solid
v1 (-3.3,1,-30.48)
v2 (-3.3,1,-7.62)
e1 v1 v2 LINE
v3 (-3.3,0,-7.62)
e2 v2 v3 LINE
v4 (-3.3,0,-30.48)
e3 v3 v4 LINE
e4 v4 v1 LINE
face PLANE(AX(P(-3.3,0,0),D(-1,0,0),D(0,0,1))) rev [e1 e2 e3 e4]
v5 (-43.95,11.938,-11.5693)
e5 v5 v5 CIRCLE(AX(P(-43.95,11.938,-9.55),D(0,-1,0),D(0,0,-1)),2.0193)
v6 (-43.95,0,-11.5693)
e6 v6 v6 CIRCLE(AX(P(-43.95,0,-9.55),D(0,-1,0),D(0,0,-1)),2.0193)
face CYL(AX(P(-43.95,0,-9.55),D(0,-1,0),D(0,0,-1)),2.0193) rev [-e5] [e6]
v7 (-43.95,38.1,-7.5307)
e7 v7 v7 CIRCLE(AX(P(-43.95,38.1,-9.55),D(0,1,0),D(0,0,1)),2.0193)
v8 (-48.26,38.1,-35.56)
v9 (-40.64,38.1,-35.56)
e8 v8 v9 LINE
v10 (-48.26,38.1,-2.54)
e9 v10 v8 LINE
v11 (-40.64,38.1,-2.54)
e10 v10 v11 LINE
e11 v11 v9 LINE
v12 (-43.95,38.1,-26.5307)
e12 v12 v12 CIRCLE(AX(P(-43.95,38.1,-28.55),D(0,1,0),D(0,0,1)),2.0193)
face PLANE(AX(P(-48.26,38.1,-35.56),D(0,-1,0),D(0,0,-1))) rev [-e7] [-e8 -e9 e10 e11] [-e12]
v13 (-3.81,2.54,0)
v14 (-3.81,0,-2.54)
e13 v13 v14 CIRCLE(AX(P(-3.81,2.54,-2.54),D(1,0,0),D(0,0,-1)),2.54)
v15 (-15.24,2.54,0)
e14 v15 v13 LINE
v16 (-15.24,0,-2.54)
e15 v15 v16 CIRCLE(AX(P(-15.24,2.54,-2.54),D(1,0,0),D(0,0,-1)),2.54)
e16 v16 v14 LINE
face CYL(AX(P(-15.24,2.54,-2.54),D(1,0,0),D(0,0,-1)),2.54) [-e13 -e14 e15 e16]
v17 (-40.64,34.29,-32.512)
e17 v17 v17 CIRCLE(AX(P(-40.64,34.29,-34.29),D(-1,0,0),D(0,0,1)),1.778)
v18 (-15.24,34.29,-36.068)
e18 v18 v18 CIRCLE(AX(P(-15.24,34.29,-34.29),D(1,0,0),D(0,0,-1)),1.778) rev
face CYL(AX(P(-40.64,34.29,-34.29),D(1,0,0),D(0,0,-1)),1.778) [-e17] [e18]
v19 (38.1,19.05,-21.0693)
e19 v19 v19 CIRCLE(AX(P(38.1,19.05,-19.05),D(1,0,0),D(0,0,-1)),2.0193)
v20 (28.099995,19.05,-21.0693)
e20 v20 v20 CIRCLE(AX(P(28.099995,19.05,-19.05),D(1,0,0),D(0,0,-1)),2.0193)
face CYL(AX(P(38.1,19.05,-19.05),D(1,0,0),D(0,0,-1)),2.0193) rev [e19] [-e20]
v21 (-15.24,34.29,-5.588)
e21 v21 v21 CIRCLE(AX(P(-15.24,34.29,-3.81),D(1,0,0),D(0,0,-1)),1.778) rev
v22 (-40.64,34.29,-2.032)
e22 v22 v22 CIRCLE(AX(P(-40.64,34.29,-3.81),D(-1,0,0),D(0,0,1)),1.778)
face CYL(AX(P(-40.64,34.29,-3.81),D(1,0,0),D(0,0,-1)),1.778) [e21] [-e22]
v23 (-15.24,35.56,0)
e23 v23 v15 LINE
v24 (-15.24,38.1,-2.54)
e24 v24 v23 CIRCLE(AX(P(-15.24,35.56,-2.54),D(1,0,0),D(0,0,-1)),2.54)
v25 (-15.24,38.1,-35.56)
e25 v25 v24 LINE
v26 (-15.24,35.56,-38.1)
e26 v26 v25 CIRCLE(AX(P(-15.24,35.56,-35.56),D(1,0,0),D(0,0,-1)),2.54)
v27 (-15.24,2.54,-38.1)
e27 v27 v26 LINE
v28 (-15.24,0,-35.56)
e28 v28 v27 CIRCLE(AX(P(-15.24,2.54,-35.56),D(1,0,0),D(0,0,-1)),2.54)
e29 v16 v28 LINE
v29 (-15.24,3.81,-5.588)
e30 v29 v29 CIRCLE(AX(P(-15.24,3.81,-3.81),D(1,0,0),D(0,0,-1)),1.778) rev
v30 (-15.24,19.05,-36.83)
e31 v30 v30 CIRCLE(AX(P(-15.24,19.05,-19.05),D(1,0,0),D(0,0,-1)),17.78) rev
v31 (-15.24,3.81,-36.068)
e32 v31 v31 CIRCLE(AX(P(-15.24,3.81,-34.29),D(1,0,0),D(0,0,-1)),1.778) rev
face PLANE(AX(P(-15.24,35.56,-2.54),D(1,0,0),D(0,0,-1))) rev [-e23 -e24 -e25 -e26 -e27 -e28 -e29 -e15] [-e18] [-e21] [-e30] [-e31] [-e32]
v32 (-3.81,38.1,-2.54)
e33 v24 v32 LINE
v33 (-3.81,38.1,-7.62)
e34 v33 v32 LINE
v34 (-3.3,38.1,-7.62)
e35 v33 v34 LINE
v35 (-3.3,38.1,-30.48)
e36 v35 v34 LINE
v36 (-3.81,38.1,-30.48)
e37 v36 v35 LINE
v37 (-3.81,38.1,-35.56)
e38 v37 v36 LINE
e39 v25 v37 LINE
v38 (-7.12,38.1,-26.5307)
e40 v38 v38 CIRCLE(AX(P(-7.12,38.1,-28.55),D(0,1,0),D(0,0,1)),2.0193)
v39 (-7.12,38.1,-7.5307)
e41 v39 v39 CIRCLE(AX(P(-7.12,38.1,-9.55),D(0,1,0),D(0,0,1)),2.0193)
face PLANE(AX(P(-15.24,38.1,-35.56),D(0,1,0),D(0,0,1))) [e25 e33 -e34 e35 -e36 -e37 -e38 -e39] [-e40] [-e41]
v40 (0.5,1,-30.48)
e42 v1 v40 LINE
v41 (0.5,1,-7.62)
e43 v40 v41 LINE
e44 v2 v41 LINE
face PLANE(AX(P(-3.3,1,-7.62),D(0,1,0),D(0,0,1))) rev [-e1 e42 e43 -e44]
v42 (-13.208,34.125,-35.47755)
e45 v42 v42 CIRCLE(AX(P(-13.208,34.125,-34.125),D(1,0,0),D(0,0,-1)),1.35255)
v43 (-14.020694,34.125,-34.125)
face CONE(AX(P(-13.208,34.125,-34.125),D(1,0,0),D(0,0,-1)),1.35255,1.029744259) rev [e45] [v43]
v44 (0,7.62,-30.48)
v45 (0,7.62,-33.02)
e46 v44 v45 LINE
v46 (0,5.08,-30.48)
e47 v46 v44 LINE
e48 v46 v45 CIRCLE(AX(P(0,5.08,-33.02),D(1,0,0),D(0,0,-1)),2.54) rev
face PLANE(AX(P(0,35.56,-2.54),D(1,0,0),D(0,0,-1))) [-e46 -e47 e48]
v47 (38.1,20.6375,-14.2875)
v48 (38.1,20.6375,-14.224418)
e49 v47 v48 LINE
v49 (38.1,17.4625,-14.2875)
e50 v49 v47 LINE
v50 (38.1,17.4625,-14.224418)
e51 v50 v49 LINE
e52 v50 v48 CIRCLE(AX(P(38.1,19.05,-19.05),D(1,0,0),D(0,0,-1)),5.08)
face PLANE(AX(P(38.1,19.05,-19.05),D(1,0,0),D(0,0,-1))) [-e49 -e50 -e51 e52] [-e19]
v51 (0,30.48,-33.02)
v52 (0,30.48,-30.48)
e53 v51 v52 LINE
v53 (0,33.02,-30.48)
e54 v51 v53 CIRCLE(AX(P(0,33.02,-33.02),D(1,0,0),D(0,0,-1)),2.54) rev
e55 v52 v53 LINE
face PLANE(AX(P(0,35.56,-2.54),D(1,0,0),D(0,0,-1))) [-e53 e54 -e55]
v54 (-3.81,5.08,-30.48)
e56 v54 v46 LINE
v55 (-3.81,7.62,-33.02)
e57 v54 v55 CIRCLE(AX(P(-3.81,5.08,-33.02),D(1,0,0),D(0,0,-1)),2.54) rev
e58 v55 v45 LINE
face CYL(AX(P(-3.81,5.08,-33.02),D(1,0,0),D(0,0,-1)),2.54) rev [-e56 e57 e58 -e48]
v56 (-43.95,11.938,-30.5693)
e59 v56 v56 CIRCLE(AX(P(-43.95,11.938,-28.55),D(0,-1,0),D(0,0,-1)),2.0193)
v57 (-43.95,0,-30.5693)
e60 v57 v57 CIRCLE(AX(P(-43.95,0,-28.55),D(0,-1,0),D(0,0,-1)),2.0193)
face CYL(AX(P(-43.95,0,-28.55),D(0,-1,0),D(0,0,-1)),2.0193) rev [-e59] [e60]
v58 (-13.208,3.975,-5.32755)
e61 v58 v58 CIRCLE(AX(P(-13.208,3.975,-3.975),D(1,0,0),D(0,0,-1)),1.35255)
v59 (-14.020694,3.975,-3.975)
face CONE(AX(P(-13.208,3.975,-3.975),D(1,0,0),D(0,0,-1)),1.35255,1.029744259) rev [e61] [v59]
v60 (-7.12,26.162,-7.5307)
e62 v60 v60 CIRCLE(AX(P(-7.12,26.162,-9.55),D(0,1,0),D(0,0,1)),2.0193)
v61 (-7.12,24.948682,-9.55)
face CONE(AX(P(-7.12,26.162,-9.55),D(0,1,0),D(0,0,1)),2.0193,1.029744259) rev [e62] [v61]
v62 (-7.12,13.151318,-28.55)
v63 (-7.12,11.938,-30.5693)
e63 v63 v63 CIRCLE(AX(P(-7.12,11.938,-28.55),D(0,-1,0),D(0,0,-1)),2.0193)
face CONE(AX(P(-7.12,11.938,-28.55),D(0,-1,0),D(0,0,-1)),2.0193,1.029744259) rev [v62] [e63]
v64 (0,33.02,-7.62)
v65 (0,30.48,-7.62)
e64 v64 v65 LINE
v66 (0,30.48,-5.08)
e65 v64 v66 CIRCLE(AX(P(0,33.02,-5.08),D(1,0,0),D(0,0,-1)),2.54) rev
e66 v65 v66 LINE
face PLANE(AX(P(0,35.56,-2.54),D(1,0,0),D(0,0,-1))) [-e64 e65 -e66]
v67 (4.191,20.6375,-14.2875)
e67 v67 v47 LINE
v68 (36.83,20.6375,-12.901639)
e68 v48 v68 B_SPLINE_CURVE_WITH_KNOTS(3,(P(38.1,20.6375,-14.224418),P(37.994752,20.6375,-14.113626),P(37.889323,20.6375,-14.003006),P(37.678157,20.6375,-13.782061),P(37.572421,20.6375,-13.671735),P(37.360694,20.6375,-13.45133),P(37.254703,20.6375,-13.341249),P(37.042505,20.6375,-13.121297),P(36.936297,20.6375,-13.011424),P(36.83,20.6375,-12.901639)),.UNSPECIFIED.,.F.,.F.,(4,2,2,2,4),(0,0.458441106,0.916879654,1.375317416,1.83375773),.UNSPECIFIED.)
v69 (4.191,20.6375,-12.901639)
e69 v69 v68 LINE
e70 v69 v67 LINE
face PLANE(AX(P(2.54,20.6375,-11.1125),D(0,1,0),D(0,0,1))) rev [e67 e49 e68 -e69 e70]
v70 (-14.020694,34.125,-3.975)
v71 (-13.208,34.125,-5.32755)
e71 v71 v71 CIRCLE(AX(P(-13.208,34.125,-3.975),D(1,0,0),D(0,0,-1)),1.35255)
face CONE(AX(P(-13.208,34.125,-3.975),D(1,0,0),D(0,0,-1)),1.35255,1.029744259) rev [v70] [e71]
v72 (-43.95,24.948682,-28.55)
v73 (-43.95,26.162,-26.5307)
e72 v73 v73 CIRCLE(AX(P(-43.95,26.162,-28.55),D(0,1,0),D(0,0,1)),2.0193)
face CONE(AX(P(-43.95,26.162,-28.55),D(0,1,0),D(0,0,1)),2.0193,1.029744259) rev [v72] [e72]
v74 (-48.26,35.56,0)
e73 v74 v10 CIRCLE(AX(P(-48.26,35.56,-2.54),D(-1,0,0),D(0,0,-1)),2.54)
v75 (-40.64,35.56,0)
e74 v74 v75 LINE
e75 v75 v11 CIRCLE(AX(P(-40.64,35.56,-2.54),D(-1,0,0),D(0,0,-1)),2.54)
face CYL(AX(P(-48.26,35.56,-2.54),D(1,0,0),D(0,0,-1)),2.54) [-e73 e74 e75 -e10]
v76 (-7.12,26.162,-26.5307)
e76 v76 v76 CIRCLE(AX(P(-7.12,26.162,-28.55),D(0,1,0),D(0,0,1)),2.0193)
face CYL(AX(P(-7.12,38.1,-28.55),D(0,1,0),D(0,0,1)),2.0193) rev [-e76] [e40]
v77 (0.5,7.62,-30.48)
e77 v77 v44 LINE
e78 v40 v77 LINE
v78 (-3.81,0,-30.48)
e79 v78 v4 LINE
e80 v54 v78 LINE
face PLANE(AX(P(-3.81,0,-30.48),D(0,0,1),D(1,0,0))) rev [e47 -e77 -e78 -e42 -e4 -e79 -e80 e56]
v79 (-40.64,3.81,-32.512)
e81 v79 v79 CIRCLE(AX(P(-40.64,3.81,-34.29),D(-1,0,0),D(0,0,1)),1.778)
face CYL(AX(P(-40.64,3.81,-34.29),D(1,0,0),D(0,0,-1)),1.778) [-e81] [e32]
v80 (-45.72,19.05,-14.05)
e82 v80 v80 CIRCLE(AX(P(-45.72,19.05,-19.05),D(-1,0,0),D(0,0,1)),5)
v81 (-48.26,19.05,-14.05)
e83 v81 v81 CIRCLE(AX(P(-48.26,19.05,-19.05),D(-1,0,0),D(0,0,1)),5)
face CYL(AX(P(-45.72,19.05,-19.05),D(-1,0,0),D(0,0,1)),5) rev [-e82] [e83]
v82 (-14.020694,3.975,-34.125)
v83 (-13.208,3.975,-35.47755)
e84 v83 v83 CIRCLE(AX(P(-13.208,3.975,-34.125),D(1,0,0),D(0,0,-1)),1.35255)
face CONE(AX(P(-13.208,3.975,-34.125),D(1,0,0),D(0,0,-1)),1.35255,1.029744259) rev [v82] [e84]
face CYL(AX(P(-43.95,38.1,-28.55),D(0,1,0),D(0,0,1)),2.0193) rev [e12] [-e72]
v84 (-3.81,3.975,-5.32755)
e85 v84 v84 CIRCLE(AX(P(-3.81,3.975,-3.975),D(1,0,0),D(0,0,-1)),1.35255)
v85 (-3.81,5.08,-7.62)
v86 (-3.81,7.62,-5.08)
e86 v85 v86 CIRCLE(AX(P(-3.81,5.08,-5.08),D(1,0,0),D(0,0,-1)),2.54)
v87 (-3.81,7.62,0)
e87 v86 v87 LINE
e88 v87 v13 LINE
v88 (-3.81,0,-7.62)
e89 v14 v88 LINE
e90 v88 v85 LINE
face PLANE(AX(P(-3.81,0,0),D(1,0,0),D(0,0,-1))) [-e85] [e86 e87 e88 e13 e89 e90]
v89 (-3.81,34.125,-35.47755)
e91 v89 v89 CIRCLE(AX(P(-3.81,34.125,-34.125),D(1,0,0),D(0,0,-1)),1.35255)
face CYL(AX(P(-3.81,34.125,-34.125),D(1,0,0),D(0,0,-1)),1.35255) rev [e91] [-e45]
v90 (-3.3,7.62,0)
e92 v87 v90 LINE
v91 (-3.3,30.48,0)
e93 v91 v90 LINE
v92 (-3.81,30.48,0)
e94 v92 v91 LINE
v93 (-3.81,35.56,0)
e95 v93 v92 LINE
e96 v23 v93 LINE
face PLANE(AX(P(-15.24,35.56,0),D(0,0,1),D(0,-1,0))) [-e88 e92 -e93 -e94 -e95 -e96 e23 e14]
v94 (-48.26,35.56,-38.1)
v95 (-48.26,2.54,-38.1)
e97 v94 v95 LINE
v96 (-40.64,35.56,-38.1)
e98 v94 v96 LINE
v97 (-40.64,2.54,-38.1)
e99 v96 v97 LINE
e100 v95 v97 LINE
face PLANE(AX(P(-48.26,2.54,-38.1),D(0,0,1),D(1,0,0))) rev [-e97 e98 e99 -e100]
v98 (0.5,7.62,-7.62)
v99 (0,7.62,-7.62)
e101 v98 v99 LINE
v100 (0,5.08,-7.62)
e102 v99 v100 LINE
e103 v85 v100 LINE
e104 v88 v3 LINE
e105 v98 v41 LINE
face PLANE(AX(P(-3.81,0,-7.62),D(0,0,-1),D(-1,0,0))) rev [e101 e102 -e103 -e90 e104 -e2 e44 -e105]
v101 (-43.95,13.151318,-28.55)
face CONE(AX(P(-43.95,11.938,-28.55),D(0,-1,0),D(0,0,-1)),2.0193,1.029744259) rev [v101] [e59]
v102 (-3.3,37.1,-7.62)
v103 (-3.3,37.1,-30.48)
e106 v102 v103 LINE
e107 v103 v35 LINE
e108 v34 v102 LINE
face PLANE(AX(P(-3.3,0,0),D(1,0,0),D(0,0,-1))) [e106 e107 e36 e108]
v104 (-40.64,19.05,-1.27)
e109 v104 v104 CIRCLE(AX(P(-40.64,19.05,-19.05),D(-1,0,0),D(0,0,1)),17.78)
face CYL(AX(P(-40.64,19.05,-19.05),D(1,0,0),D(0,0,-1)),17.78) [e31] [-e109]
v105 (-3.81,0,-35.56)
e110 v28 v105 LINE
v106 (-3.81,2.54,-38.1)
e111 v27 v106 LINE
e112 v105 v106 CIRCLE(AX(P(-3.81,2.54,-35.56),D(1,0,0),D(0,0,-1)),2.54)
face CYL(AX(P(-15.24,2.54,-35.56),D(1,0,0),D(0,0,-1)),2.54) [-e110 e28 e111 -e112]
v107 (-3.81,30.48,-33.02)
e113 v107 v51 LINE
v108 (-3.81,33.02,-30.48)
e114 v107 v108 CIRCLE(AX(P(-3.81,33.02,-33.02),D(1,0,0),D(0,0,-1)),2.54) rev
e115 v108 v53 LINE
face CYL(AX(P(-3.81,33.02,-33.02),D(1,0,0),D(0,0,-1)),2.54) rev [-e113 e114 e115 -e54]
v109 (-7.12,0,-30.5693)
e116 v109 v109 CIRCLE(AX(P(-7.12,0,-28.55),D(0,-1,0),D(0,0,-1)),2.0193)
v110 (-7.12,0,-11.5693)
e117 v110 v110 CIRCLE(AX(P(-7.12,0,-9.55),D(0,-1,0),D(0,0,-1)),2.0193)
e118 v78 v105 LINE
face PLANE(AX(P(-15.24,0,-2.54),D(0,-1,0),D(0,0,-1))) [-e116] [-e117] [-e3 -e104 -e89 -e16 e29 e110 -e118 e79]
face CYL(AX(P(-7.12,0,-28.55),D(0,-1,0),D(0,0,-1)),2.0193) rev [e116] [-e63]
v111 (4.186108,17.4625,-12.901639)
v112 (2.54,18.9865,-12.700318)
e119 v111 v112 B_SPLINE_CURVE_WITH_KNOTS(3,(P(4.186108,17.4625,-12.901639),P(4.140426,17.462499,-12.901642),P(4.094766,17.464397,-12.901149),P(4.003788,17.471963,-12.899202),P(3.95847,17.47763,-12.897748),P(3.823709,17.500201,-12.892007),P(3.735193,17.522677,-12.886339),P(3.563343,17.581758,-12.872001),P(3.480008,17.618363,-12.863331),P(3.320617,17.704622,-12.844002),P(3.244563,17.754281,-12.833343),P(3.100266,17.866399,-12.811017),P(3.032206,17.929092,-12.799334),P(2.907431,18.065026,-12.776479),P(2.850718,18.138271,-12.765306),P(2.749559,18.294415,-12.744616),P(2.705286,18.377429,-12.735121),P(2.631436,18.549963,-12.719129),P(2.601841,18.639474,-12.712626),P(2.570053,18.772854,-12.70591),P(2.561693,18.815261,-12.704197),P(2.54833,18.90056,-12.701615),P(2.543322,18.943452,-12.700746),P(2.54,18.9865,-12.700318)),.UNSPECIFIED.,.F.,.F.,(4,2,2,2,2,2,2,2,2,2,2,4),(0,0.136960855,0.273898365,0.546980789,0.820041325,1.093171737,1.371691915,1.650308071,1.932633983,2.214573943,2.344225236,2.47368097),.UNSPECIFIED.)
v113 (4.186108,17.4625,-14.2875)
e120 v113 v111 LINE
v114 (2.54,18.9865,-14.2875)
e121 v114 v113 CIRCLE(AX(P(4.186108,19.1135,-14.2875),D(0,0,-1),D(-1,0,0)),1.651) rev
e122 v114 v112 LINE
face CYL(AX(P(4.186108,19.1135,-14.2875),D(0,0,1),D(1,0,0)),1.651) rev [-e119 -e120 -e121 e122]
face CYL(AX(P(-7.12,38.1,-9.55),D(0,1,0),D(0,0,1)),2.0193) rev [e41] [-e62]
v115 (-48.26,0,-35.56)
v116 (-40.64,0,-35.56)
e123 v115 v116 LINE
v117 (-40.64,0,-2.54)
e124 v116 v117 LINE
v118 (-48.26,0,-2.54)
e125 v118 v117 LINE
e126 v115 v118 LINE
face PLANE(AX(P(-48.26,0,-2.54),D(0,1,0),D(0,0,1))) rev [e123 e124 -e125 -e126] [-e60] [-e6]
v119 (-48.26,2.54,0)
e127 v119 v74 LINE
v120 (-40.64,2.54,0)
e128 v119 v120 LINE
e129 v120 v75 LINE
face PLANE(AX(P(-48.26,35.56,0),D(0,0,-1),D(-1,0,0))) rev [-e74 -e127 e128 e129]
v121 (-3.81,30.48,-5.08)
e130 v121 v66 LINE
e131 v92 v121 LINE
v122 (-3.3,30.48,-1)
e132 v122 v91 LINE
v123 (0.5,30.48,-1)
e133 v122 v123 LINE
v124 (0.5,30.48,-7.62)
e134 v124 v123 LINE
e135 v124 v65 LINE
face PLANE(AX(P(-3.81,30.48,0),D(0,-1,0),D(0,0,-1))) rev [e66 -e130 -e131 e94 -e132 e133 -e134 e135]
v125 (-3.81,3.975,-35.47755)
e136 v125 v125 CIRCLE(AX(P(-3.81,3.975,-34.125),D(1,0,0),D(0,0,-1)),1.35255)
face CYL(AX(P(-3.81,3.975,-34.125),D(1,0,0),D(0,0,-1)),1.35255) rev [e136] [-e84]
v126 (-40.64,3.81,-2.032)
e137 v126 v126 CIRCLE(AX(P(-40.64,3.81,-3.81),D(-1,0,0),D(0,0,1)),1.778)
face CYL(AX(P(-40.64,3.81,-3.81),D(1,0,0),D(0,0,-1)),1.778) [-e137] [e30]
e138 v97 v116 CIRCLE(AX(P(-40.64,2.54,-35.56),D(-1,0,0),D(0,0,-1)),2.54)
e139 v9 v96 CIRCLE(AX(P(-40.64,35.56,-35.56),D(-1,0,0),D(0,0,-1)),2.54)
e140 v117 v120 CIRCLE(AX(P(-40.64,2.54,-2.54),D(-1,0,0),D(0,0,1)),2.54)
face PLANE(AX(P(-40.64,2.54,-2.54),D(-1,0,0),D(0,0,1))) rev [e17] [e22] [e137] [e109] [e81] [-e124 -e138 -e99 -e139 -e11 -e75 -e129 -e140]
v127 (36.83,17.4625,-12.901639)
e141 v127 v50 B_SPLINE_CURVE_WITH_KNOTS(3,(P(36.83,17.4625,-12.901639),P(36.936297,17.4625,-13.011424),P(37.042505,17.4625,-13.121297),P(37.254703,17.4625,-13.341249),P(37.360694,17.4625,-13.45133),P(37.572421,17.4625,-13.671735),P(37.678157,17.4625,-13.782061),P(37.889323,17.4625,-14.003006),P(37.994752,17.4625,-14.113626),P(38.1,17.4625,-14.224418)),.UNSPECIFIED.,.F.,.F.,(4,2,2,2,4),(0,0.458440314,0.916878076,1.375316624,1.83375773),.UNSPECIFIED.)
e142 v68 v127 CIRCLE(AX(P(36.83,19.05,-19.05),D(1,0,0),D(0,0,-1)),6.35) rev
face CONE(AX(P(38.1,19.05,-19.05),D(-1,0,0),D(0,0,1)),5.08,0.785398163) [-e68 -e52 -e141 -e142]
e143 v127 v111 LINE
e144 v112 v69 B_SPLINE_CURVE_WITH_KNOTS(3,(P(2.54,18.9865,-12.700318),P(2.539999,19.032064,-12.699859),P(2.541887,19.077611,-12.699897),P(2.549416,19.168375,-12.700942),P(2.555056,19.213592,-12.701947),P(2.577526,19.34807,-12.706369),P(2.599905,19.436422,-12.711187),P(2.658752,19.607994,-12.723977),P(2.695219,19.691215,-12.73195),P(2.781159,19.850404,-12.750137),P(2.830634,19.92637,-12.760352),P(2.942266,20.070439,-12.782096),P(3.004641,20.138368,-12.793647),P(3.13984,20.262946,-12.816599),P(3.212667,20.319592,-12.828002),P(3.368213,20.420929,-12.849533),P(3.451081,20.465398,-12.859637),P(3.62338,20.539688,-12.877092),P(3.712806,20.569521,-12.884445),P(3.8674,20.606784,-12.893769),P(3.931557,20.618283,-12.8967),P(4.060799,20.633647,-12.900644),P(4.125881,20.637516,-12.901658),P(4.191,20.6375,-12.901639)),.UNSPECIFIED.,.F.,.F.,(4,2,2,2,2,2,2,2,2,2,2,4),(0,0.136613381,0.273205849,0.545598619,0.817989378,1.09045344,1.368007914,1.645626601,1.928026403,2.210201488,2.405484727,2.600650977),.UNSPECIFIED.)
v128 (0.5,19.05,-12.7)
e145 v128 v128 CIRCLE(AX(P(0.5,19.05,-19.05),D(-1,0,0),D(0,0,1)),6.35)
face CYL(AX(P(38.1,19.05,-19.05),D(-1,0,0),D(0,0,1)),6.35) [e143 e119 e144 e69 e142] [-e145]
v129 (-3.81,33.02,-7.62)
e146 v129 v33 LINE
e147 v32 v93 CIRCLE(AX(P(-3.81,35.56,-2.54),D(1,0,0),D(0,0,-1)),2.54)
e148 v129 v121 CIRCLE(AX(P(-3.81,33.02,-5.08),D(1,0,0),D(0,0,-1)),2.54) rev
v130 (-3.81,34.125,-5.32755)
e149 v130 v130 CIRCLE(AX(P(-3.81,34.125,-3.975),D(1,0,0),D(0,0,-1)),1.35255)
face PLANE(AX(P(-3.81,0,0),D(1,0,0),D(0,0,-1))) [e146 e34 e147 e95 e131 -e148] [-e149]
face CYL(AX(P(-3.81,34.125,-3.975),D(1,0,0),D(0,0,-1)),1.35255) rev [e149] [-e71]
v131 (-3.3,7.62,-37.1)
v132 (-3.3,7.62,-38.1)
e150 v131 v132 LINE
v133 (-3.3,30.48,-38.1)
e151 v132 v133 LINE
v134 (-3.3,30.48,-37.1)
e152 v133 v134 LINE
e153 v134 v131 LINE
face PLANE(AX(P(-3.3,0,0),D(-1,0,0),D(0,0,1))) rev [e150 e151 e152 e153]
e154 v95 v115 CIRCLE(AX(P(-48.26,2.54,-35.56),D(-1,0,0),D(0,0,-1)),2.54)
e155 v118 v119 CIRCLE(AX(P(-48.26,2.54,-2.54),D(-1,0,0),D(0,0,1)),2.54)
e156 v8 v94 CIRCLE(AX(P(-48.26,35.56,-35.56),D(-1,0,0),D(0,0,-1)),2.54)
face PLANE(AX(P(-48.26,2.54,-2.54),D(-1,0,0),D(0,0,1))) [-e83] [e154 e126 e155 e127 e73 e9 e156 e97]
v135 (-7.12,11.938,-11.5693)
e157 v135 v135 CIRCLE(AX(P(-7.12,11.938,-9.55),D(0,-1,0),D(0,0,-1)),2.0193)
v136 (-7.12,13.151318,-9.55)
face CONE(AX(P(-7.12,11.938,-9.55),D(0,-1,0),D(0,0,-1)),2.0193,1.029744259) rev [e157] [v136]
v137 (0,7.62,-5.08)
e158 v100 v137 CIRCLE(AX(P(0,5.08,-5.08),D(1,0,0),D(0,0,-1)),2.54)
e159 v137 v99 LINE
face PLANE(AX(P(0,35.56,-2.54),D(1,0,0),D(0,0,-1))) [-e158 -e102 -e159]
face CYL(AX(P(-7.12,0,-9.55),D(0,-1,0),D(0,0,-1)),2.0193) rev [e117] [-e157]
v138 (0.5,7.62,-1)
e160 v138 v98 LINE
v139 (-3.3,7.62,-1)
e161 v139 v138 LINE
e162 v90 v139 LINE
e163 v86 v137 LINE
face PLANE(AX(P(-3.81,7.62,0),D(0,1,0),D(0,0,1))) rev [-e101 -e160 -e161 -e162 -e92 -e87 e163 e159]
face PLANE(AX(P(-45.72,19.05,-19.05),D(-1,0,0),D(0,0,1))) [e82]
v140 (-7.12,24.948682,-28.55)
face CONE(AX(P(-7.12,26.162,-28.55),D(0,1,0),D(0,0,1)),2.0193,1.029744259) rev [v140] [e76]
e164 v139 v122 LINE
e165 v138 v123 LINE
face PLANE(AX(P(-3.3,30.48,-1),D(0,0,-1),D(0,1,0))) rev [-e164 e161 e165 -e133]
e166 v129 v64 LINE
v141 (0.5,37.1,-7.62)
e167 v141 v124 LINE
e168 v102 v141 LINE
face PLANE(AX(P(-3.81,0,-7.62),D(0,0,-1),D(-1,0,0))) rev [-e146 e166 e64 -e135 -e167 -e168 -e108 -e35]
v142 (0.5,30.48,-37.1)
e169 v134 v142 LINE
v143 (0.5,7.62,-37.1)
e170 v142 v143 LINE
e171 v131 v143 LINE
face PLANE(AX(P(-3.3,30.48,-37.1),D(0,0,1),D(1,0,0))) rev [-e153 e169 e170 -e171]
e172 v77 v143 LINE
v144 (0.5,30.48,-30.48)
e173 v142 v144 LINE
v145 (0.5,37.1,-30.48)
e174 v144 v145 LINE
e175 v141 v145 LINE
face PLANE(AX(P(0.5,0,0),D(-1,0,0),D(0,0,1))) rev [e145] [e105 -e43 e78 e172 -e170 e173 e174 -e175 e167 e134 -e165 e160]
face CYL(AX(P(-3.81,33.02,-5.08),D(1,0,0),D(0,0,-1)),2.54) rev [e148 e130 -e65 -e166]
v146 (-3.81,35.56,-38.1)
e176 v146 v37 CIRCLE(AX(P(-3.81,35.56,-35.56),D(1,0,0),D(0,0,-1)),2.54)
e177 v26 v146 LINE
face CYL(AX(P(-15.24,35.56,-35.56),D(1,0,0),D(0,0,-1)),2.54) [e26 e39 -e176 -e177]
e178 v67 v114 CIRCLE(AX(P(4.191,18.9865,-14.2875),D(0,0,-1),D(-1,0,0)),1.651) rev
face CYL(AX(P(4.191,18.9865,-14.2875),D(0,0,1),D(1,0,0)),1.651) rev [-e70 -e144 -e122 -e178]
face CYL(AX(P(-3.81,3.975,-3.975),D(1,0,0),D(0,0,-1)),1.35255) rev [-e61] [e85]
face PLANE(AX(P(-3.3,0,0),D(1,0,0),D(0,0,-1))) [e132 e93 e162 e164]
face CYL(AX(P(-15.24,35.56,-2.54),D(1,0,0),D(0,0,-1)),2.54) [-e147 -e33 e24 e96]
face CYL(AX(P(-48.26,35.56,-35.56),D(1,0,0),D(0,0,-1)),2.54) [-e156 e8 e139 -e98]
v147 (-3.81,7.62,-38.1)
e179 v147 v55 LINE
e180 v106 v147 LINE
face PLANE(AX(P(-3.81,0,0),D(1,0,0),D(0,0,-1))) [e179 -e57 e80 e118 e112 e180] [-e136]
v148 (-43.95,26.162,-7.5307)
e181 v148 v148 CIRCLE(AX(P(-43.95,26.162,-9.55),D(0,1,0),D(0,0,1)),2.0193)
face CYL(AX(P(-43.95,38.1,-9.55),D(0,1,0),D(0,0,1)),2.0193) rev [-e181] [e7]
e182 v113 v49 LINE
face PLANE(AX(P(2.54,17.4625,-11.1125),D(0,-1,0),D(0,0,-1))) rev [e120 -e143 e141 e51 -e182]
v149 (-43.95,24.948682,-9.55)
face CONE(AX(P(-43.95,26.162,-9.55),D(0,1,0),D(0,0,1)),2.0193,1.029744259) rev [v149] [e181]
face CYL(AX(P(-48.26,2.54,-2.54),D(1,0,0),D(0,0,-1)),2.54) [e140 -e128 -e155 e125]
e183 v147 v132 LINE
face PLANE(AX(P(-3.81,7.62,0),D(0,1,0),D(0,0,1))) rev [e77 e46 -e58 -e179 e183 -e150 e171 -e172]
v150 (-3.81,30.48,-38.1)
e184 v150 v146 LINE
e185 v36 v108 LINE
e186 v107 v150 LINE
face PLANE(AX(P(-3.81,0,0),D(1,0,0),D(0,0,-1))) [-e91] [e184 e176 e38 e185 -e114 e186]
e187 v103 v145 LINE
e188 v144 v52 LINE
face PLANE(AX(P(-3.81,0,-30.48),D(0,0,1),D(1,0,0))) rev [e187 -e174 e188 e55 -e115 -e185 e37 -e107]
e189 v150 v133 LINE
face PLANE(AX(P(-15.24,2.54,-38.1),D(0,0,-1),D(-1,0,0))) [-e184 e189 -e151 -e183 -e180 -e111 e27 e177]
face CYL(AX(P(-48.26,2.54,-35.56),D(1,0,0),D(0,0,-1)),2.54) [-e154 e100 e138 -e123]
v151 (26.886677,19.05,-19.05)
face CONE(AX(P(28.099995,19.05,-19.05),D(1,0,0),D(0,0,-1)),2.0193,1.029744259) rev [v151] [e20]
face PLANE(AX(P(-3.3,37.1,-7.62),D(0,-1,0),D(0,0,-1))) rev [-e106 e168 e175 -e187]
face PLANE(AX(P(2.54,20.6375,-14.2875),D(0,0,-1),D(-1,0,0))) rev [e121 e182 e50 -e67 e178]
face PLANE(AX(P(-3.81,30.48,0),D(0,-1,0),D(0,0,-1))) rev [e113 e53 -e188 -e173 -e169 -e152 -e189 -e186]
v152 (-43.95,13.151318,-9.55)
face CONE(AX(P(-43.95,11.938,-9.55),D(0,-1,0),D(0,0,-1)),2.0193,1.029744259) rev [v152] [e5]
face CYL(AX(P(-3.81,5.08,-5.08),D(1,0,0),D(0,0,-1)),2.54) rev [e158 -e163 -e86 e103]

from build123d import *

# Parameters (mm, degrees)
EXTRUS_O1_DEPTH                      = 15.24
EXTRUS_O2_DEPTH                      = 3.81
ESBO_O4_R                            = 6.35
EXTRUS_O3_DEPTH                      = 38.1
ESBO_O5_R                            = 17.78
EXTRUS_O4_DEPTH                      = 25.4
ESBO_O6_R                            = 1.778
EXTRUS_O5_DEPTH                      = 25.4
EXTRUS_O6_DEPTH                      = 7.62
ESBO_O8_W                            = 3.175
ESBO_O8_H                            = 3.175
EXTRUS_O8_DEPTH                      = 35.56
FILETE5_R                            = 1.651
FILETE6_R                            = 1.651
CHANFRO1_SIZE                        = 1.27
F_10_32_TAPPED_HOLE3_D               = 4.0386
F_10_32_TAPPED_HOLE3_DEPTH           = 11.938
F_10_32_TAPPED_HOLE3_TIP             = 1.213317848
F_10_32_TAPPED_HOLE3_ON_FACE_2_D     = 4.0386
F_10_32_TAPPED_HOLE3_ON_FACE_2_DEPTH = 11.938
F_10_32_TAPPED_HOLE3_ON_FACE_2_TIP   = 1.213317848
ESBO_O17_R                           = 5.000000033
CORTE_EXTRUS_O1_DEPTH                = 2.54
F_10_32_TAPPED_HOLE1_D               = 4.0386
F_10_32_TAPPED_HOLE1_DEPTH           = 10.0000054
F_10_32_TAPPED_HOLE1_TIP             = 1.213317848
BOSS_EXTRUDE1_DEPTH                  = 0.5
F_10_32_TAPPED_HOLE2_D               = 4.0386
F_10_32_TAPPED_HOLE2_DEPTH           = 11.938
F_10_32_TAPPED_HOLE2_TIP             = 1.213317848
F_6_32_TAPPED_HOLE1_D                = 2.7051
F_6_32_TAPPED_HOLE1_DEPTH            = 9.398
F_6_32_TAPPED_HOLE1_TIP              = 0.81269403
ESBO_O18_W                           = 1
ESBO_O18_H                           = 22.86
ESBO_O18_W_2                         = 22.86
ESBO_O18_H_2                         = 1
CORTE_EXTRUS_O2_DEPTH                = 3.8


with BuildPart() as part:
    # Esboço2 → Extrusão1 (new body)
    with BuildSketch(Plane(origin=(0, 0, 0), x_dir=(0, 0, -1), z_dir=(1, 0, 0))):
        with BuildLine():
            Line((2.54, 0), (35.56, 0))
            ThreePointArc((35.56, 0), (37.356051224, 0.743948776), (38.1, 2.54))
            Line((38.1, 2.54), (38.1, 35.56))
            ThreePointArc((38.1, 35.56), (37.356051224, 37.356051224), (35.56, 38.1))
            Line((35.56, 38.1), (2.54, 38.1))
            ThreePointArc((2.54, 38.1), (0.743948776, 37.356051224), (0, 35.56))
            Line((0, 35.56), (0, 2.54))
            ThreePointArc((0, 2.54), (0.743948776, 0.743948776), (2.54, 0))
        make_face()
    extrude(amount=-EXTRUS_O1_DEPTH)

    # Esboço3 → Extrusão2 (cut)
    with BuildSketch(Plane(origin=(0, 0, 0), x_dir=(0, 0, -1), z_dir=(1, 0, 0))):
        with BuildLine():
            Line((0, 35.56), (0, 30.48))
            Line((0, 30.48), (5.08, 30.48))
            ThreePointArc((5.08, 30.48), (6.876051224, 31.223948776), (7.62, 33.02))
            Line((7.62, 33.02), (7.62, 38.1))
            Line((7.62, 38.1), (2.54, 38.1))
            ThreePointArc((2.54, 38.1), (0.743948776, 37.356051224), (0, 35.56))
        make_face()
        with BuildLine():
            ThreePointArc((0, 2.54), (0.743948776, 0.743948776), (2.54, 0))
            Line((2.54, 0), (7.62, 0))
            Line((7.62, 0), (7.62, 5.08))
            ThreePointArc((7.62, 5.08), (6.876051224, 6.876051224), (5.08, 7.62))
            Line((5.08, 7.62), (0, 7.62))
            Line((0, 7.62), (0, 2.54))
        make_face()
        with BuildLine():
            Line((30.48, 5.08), (30.48, 0))
            Line((30.48, 0), (35.56, 0))
            ThreePointArc((35.56, 0), (37.356051224, 0.743948776), (38.1, 2.54))
            Line((38.1, 2.54), (38.1, 7.62))
            Line((38.1, 7.62), (33.02, 7.62))
            ThreePointArc((33.02, 7.62), (31.223948776, 6.876051224), (30.48, 5.08))
        make_face()
        with BuildLine():
            Line((33.02, 30.48), (38.1, 30.48))
            Line((38.1, 30.48), (38.1, 35.56))
            ThreePointArc((38.1, 35.56), (37.356051224, 37.356051224), (35.56, 38.1))
            Line((35.56, 38.1), (30.48, 38.1))
            Line((30.48, 38.1), (30.48, 33.02))
            ThreePointArc((30.48, 33.02), (31.223948776, 31.223948776), (33.02, 30.48))
        make_face()
    extrude(amount=-EXTRUS_O2_DEPTH, mode=Mode.SUBTRACT)

    # Esboço4 → Extrusão3 (add)
    with BuildSketch(Plane(origin=(0, 0, 0), x_dir=(0, 0, -1), z_dir=(1, 0, 0))):
        with Locations(Location((19.05, 19.05, 0), (0, 0, 180))):
            Circle(ESBO_O4_R)
    extrude(amount=EXTRUS_O3_DEPTH)

    # Esboço5 → Extrusão4 (add)
    with BuildSketch(Plane.ZY.offset(15.24)):
        with Locations(Location((-19.05, 19.05, 0), (0, 0, 180))):
            Circle(ESBO_O5_R)
    extrude(amount=EXTRUS_O4_DEPTH)

    # Esboço6 → Extrusão5 (add)
    with BuildSketch(Plane.ZY.offset(15.24)):
        with Locations(Location((-3.81, 3.81, 0), (0, 0, 180))):
            Circle(ESBO_O6_R)
        with Locations(Location((-34.29, 3.81, 0), (0, 0, 180))):
            Circle(ESBO_O6_R)
        with Locations(Location((-3.81, 34.29, 0), (0, 0, 180))):
            Circle(ESBO_O6_R)
        with Locations(Location((-34.29, 34.29, 0), (0, 0, 180))):
            Circle(ESBO_O6_R)
    extrude(amount=EXTRUS_O5_DEPTH)

    # Esboço7 → Extrusão6 (add)
    with BuildSketch(Plane.ZY.offset(40.64)):
        with BuildLine():
            Line((-2.54, 0), (-35.56, 0))
            ThreePointArc((-35.56, 0), (-37.356051224, 0.743948776), (-38.1, 2.54))
            Line((-38.1, 2.54), (-38.1, 35.56))
            ThreePointArc((-38.1, 35.56), (-37.356051224, 37.356051224), (-35.56, 38.1))
            Line((-35.56, 38.1), (-2.54, 38.1))
            ThreePointArc((-2.54, 38.1), (-0.743948776, 37.356051224), (0, 35.56))
            Line((0, 35.56), (0, 2.54))
            ThreePointArc((0, 2.54), (-0.743948776, 0.743948776), (-2.54, 0))
        make_face()
    extrude(amount=EXTRUS_O6_DEPTH)

    # Esboço8 → Extrusão8 (cut)
    with BuildSketch(Plane(origin=(38.1, 0, 0), x_dir=(0, 0, -1), z_dir=(1, 0, 0))):
        with Locations((12.7, 19.05)):
            Rectangle(ESBO_O8_W, ESBO_O8_H)
    extrude(amount=-EXTRUS_O8_DEPTH, mode=Mode.SUBTRACT)

    # Filete5
    # the kernel refuses this fillet: 1.651 mm, written as the material it adds along each edge
    with BuildSketch(Plane(origin=(2.54, 20.6375, -8.774138938), x_dir=(0, -1, 0), z_dir=(0, 0, -1))) as filete5_piece_1_section:
        with BuildLine():
            CenterArc((FILETE5_R, -FILETE5_R), FILETE5_R, 90, 90)
            Line((0, -FILETE5_R), (0, 0))
            Line((0, 0), (FILETE5_R, 0))
        make_face()
    filete5_piece_1 = extrude(amount=9.640861062, mode=Mode.PRIVATE)
    filete5_piece_1 = filete5_piece_1 & Plane(origin=(2.54, 19.05, -19.05), x_dir=(0, 0, 1), z_dir=(-1, 0, 0)) * Cylinder(6.35, 26, mode=Mode.PRIVATE)
    add(filete5_piece_1)

    # Filete6
    # the kernel refuses this fillet: 1.651 mm, written as the material it adds along each edge
    with BuildSketch(Plane(origin=(2.54, 17.4625, -18.402770343), x_dir=(0, 1, 0), z_dir=(0, 0, 1))) as filete6_piece_1_section:
        with BuildLine():
            CenterArc((1.651, -1.646108137), FILETE6_R, 94.411725786, 85.588274214)
            Line((0, -1.646108137), (-0.03302, -1.646108137))
            Line((-0.03302, -1.646108137), (-0.03302, 0))
            Line((-0.03302, 0), (0, 0.03302))
            ThreePointArc((0, 0.03302), (0.762, 0.03302), (1.52146, 0.032922163))
            Line((1.52146, 0.032922163), (1.524, 0))
        make_face()
    filete6_piece_1 = extrude(amount=9.616401749, mode=Mode.PRIVATE)
    filete6_piece_1 = filete6_piece_1 & Plane(origin=(2.54, 19.05, -19.05), x_dir=(0, 0, 1), z_dir=(-1, 0, 0)) * Cylinder(6.35, 26, mode=Mode.PRIVATE)
    add(filete6_piece_1)

    # Chanfro1
    # the kernel refuses this chamfer: 1.27 mm, written as the material it takes off along each edge
    with BuildSketch(Plane(origin=(38.1, 19.05, -19.05), x_dir=(0, -0.003141587485879291, 0.9999950652018581), z_dir=(0, 0.9999950652018581, 0.003141587485879291))) as chanfro1_piece_1:
        Polygon((6.35, -CHANFRO1_SIZE), (6.35 - CHANFRO1_SIZE, 0), (6.35, 0), align=None)
    revolve(axis=Axis((38.1, 19.05, -19.05), (1, 0, 0)), revolution_arc=359.64, mode=Mode.SUBTRACT)

    # #10-32 Tapped Hole3
    with Locations(Plane(origin=(-7.12, 38.1, -9.54999995), x_dir=(0, 0, 1), z_dir=(0, 1, 0))):
        with Locations((0, 0), (-19.00000005, 0), (-5e-08, -36.83), (-19.0000001, -36.829999984)):
            Hole(F_10_32_TAPPED_HOLE3_D / 2, depth=F_10_32_TAPPED_HOLE3_DEPTH)
            with Locations((0, 0, -(F_10_32_TAPPED_HOLE3_DEPTH + F_10_32_TAPPED_HOLE3_TIP / 2))):  # 118° drill point
                Cone(0, F_10_32_TAPPED_HOLE3_D / 2, F_10_32_TAPPED_HOLE3_TIP, mode=Mode.SUBTRACT)

    # #10-32 Tapped Hole3 on face 2
    with Locations(Plane(origin=(-6.765900445, 0, 15.465533415), x_dir=(0, 0, 1), z_dir=(0, 1, 0))):
        with Locations((0, 0), (-1.090277919, -0.890410597)):
            Hole(F_10_32_TAPPED_HOLE3_ON_FACE_2_D / 2, depth=F_10_32_TAPPED_HOLE3_ON_FACE_2_DEPTH)
            with Locations((0, 0, -(F_10_32_TAPPED_HOLE3_ON_FACE_2_DEPTH + F_10_32_TAPPED_HOLE3_ON_FACE_2_TIP / 2))):  # 118° drill point
                Cone(0, F_10_32_TAPPED_HOLE3_ON_FACE_2_D / 2, F_10_32_TAPPED_HOLE3_ON_FACE_2_TIP, mode=Mode.SUBTRACT)

    # Esboço17 → Corte-extrusão1 (cut)
    with BuildSketch(Plane.ZY.offset(48.26)):
        with Locations((-19.05, 19.05)):
            Circle(ESBO_O17_R)
    extrude(amount=-CORTE_EXTRUS_O1_DEPTH, mode=Mode.SUBTRACT)

    # #10-32 Tapped Hole1
    with Locations(Plane(origin=(38.1, 0, 0), x_dir=(0, 0, -1), z_dir=(1, 0, 0))):
        with Locations((19.05, 19.05)):
            Hole(F_10_32_TAPPED_HOLE1_D / 2, depth=F_10_32_TAPPED_HOLE1_DEPTH)
            with Locations((0, 0, -(F_10_32_TAPPED_HOLE1_DEPTH + F_10_32_TAPPED_HOLE1_TIP / 2))):  # 118° drill point
                Cone(0, F_10_32_TAPPED_HOLE1_D / 2, F_10_32_TAPPED_HOLE1_TIP, mode=Mode.SUBTRACT)

    # Sketch4 → Boss-Extrude1 (add)
    with BuildSketch(Plane(origin=(0, 0, 0), x_dir=(0, 0, -1), z_dir=(1, 0, 0))):
        Polygon((30.48, 0), (7.62, 0), (7.62, 7.62), (0, 7.62), (0, 30.48), (7.62, 30.48), (7.62, 38.1), (30.48, 38.1), (30.48, 30.48), (38.1, 30.48), (38.1, 7.62), (30.48, 7.62), align=None)
    extrude(amount=BOSS_EXTRUDE1_DEPTH)

    # #10-32 Tapped Hole2
    with Locations(Plane.XZ):
        with Locations((-7.12, -9.55), (-7.12, -28.55), (-43.949999984, -9.55), (-43.949999984, -28.55)):
            Hole(F_10_32_TAPPED_HOLE2_D / 2, depth=F_10_32_TAPPED_HOLE2_DEPTH)
            with Locations((0, 0, -(F_10_32_TAPPED_HOLE2_DEPTH + F_10_32_TAPPED_HOLE2_TIP / 2))):  # 118° drill point
                Cone(0, F_10_32_TAPPED_HOLE2_D / 2, F_10_32_TAPPED_HOLE2_TIP, mode=Mode.SUBTRACT)

    # #6-32 Tapped Hole1
    with Locations(Plane(origin=(-3.81, 0, 0), x_dir=(0, 0, -1), z_dir=(1, 0, 0))):
        with Locations((3.975, 34.125), (34.125, 34.125), (3.975, 3.975), (34.125, 3.975)):
            Hole(F_6_32_TAPPED_HOLE1_D / 2, depth=F_6_32_TAPPED_HOLE1_DEPTH)
            with Locations((0, 0, -(F_6_32_TAPPED_HOLE1_DEPTH + F_6_32_TAPPED_HOLE1_TIP / 2))):  # 118° drill point
                Cone(0, F_6_32_TAPPED_HOLE1_D / 2, F_6_32_TAPPED_HOLE1_TIP, mode=Mode.SUBTRACT)

    # Esboço18 → Corte-extrusão2 (cut)
    with BuildSketch(Plane(origin=(0.5, 0, 0), x_dir=(0, 0, -1), z_dir=(1, 0, 0))):
        with Locations((0.5, 19.05)):
            Rectangle(ESBO_O18_W, ESBO_O18_H)
        with Locations((19.05, 37.6)):
            Rectangle(ESBO_O18_W_2, ESBO_O18_H_2)
        with Locations((37.6, 19.05)):
            Rectangle(ESBO_O18_W, ESBO_O18_H)
        with Locations((19.05, 0.5)):
            Rectangle(ESBO_O18_W_2, ESBO_O18_H_2)
    extrude(amount=-CORTE_EXTRUS_O2_DEPTH, mode=Mode.SUBTRACT)


solid = part.part
